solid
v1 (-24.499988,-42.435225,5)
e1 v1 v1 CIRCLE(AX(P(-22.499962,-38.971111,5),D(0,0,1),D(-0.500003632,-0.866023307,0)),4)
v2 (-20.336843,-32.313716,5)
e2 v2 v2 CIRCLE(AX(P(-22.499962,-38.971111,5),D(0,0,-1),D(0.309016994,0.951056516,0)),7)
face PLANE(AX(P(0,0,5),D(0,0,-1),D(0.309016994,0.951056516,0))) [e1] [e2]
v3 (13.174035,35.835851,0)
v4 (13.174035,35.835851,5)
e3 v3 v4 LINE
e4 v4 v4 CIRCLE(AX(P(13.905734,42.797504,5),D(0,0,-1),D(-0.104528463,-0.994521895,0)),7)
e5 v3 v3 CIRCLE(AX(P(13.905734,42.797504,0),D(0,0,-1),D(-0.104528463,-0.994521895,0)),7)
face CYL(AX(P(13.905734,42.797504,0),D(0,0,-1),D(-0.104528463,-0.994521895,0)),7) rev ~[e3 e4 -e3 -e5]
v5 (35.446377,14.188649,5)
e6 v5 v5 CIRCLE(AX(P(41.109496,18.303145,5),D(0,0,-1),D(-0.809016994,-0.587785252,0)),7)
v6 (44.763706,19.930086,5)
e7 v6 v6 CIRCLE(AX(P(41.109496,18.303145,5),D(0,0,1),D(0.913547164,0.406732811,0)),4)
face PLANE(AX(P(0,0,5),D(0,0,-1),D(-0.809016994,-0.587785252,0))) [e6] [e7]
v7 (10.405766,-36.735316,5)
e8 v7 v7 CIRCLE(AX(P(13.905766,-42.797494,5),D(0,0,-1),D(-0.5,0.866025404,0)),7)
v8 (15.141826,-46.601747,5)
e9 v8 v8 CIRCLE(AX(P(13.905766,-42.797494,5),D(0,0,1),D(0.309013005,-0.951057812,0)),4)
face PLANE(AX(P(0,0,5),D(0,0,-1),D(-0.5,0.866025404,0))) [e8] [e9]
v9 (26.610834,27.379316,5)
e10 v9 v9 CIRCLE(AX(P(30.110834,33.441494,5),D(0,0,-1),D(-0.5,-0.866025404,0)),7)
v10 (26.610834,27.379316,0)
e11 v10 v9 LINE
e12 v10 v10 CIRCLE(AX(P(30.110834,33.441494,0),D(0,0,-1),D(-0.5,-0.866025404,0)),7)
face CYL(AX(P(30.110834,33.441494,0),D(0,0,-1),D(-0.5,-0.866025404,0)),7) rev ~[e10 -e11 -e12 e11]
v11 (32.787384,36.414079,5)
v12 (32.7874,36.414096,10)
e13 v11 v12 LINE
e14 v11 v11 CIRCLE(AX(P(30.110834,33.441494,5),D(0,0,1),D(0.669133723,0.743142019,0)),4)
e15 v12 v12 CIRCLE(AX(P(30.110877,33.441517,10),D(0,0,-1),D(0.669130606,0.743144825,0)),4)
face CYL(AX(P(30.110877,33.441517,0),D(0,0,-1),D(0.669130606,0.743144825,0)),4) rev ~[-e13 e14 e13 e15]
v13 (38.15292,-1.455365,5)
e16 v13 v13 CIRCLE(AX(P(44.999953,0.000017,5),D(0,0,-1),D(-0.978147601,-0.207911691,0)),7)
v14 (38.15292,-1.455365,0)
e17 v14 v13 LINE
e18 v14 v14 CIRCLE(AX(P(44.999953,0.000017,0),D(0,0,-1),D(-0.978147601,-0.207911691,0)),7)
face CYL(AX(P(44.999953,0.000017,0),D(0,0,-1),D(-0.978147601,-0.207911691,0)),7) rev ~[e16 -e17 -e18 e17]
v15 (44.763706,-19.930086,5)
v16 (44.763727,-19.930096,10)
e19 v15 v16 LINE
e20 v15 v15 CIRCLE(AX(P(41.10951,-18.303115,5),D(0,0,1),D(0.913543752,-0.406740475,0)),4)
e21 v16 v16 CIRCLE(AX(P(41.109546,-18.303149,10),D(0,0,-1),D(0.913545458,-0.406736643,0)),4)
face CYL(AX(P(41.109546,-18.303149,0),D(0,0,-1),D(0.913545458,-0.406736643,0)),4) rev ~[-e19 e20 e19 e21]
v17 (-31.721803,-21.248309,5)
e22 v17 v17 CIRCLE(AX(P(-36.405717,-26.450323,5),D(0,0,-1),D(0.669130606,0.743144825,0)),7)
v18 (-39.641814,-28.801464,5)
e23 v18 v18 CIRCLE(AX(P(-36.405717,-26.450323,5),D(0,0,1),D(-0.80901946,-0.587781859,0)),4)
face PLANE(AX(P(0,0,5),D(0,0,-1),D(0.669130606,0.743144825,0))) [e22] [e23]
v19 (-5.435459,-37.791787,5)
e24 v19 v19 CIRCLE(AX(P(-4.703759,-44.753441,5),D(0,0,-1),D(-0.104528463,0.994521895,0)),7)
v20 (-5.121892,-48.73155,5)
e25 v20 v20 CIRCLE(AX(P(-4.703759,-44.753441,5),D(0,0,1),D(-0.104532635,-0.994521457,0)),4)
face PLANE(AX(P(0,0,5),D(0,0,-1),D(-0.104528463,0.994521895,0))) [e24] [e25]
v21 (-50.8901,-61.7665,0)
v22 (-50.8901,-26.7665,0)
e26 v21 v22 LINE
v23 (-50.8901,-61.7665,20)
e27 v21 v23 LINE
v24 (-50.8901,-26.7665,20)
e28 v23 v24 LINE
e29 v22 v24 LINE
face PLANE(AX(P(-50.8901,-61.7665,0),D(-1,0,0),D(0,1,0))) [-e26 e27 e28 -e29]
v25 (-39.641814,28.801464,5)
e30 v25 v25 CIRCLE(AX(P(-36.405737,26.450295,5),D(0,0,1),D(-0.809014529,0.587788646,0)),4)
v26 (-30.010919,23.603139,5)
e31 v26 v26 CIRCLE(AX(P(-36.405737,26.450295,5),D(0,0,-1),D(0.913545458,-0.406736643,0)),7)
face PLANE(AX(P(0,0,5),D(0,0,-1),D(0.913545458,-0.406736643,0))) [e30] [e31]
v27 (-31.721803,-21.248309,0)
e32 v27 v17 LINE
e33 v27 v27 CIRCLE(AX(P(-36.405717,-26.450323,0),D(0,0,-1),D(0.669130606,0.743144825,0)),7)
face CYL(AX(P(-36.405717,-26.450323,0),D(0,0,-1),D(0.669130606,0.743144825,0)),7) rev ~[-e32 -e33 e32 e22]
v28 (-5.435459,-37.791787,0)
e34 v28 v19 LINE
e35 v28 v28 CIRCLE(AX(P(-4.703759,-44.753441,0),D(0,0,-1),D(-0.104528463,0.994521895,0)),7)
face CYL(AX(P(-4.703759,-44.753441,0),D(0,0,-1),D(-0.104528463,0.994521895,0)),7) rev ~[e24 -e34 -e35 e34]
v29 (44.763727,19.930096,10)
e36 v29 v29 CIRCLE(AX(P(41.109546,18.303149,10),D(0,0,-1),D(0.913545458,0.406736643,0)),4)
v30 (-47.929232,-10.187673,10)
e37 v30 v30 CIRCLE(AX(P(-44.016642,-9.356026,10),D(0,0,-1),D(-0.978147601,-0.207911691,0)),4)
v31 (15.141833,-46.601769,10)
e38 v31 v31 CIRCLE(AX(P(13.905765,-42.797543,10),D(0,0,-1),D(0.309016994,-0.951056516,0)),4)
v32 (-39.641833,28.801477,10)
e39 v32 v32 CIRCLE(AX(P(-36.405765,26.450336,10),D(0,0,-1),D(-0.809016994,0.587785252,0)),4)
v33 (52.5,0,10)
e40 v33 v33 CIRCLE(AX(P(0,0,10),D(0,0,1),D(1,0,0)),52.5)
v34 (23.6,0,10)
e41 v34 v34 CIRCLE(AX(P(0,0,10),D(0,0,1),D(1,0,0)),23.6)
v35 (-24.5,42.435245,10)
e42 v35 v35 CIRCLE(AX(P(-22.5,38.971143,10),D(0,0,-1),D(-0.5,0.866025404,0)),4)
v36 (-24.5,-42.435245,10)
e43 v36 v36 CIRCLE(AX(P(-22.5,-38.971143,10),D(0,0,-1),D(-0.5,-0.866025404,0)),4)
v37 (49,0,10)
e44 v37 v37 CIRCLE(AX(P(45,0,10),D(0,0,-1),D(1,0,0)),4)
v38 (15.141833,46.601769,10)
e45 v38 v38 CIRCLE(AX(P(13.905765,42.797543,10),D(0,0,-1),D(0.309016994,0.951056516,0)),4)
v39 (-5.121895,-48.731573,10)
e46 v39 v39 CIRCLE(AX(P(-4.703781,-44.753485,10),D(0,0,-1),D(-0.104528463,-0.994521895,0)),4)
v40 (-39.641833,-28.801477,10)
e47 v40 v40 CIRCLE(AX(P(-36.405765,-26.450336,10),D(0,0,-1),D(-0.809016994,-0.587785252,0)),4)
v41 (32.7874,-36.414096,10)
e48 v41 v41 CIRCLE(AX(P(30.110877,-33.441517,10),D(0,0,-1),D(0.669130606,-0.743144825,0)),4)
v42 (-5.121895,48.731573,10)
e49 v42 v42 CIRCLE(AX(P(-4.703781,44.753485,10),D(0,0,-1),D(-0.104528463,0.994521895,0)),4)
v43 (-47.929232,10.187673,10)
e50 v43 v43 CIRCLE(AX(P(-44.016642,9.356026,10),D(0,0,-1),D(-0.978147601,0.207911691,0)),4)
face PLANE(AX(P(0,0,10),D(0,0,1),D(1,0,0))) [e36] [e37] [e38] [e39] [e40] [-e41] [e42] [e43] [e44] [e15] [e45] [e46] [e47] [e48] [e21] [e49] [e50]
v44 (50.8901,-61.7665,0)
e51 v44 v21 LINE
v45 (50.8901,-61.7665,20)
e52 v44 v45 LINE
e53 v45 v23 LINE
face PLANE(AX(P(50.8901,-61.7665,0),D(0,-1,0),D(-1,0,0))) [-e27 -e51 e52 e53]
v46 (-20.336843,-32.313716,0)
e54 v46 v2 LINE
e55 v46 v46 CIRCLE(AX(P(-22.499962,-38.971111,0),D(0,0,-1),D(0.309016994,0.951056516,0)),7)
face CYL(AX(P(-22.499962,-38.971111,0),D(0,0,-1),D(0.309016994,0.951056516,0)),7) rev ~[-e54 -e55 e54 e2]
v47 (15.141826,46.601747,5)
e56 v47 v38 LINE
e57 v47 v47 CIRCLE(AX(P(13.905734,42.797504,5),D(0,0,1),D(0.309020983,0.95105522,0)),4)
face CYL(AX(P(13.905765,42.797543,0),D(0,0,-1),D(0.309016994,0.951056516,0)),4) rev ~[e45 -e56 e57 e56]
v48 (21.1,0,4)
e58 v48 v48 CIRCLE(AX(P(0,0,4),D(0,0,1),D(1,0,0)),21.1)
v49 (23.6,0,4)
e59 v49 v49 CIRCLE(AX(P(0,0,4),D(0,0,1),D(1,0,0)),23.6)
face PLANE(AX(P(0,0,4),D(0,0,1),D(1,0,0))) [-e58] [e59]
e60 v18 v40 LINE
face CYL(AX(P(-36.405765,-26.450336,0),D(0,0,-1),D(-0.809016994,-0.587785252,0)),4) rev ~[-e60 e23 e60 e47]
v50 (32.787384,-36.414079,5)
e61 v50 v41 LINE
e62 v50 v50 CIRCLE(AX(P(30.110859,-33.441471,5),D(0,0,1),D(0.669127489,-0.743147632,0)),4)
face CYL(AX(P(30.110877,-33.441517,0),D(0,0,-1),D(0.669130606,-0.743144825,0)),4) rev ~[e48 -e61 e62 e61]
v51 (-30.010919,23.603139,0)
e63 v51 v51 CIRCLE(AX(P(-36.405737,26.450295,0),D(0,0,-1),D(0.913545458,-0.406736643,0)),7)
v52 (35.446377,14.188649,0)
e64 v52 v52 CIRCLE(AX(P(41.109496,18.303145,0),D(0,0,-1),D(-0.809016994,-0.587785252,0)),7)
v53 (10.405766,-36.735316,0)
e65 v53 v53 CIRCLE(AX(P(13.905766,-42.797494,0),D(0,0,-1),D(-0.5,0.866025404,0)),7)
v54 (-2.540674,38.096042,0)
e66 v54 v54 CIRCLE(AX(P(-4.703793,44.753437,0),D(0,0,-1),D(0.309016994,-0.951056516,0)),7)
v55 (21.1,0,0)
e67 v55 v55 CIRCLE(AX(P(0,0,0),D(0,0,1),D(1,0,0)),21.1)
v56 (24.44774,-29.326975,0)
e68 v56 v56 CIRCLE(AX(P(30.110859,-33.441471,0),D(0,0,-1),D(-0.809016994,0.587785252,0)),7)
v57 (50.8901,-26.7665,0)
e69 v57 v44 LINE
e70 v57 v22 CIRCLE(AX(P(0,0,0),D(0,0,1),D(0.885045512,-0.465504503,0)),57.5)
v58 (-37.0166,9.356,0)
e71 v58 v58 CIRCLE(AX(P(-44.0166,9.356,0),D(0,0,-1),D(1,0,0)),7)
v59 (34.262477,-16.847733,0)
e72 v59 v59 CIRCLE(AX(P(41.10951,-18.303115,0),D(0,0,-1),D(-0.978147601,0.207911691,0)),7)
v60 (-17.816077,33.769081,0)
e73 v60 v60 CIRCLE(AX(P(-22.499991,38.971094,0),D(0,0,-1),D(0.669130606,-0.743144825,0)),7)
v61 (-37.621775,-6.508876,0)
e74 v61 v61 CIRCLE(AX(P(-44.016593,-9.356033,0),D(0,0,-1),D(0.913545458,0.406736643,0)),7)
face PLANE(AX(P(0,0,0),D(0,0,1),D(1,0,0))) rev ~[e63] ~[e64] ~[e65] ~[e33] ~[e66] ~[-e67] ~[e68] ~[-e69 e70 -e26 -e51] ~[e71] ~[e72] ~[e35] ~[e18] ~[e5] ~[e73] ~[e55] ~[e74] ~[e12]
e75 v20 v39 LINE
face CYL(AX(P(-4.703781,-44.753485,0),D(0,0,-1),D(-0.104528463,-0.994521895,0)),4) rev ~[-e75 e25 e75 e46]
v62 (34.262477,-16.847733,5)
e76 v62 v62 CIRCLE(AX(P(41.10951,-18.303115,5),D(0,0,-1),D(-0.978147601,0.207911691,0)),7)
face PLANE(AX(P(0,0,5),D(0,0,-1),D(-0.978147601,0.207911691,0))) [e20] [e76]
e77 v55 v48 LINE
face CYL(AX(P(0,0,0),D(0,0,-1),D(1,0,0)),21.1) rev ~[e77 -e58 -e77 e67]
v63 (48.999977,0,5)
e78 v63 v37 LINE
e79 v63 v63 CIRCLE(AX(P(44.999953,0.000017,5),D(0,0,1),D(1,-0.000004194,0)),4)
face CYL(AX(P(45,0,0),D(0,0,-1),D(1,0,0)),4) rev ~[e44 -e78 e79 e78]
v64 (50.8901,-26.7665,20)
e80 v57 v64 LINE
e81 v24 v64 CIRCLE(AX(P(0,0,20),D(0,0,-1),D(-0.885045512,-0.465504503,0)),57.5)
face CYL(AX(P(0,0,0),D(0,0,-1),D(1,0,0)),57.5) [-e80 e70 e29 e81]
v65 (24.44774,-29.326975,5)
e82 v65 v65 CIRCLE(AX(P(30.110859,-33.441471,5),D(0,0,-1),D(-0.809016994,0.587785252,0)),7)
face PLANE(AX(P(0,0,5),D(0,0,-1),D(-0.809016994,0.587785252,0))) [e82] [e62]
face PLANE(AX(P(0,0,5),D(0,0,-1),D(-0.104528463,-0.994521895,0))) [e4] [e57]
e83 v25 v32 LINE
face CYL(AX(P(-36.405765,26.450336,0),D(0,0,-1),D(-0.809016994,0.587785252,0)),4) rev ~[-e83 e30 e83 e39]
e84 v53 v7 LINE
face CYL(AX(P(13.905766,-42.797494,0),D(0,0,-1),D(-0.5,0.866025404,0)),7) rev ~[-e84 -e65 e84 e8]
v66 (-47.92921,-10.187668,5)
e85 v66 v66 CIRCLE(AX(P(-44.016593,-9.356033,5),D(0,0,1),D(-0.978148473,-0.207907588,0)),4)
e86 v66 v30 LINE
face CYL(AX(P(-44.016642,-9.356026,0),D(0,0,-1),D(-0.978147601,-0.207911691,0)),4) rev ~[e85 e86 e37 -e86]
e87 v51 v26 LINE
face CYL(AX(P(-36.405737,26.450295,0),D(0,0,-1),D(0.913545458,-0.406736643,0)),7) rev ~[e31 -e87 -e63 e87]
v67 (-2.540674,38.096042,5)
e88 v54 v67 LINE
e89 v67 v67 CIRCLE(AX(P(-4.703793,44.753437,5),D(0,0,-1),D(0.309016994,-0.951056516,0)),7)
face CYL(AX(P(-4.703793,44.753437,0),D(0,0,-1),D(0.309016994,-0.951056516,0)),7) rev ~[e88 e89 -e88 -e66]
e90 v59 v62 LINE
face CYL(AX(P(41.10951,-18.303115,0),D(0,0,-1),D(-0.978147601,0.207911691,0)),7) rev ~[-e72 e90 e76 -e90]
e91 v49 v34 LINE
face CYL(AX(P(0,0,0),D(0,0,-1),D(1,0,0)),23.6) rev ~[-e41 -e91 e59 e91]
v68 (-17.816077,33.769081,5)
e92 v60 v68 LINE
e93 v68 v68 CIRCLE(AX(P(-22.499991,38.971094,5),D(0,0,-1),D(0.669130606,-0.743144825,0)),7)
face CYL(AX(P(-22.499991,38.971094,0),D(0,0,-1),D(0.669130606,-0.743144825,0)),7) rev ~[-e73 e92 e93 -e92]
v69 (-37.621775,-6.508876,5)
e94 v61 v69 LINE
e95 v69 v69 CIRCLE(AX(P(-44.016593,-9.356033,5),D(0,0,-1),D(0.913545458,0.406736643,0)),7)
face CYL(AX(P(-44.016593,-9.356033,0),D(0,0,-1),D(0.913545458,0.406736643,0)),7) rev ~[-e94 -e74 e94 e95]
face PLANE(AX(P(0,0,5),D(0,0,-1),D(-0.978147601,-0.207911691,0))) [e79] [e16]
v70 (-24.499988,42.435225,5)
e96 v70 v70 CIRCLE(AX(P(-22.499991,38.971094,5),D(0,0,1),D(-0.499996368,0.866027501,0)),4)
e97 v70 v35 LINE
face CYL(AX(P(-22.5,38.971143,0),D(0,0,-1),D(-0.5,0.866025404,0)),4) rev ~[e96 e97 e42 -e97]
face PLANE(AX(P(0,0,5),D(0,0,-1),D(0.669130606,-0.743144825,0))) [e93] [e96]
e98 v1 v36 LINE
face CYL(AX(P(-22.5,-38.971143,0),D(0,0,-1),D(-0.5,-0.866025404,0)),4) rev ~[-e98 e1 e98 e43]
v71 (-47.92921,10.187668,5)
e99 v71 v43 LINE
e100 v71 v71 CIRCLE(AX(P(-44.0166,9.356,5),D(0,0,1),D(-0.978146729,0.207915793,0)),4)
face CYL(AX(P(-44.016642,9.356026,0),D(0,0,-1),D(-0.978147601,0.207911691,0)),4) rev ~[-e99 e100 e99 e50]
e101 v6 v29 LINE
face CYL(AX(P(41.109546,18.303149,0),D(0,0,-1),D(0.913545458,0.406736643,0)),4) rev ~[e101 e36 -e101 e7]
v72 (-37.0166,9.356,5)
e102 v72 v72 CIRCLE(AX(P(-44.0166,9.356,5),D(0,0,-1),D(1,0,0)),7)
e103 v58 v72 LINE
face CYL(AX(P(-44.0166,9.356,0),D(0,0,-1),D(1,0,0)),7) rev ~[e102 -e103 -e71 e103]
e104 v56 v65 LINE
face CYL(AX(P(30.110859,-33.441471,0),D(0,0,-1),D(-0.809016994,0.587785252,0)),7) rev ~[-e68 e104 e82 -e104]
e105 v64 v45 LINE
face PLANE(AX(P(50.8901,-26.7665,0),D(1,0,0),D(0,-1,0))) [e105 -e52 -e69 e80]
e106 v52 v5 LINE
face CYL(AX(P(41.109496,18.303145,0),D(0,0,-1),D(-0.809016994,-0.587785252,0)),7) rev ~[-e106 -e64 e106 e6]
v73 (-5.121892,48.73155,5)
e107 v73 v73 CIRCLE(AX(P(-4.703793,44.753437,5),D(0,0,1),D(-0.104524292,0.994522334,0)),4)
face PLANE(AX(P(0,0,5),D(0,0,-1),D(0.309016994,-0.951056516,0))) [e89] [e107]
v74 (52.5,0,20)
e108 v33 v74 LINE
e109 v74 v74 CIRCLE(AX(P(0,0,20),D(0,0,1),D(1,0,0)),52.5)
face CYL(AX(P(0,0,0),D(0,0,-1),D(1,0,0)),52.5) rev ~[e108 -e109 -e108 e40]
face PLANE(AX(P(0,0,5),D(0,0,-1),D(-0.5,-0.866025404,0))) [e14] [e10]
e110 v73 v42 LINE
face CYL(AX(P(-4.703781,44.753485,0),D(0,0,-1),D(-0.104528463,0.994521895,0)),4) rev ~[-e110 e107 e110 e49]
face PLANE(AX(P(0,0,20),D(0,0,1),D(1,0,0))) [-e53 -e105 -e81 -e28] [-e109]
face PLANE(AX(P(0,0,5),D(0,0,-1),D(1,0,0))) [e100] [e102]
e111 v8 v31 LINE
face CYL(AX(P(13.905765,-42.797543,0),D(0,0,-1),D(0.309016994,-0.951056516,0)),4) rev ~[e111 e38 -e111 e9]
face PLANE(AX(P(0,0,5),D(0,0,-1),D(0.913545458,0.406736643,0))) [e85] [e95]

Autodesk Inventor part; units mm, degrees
ref_plane "YZ Plane" through (0, 0, 0) normal (1, 0, 0) x (0, 1, 0)
ref_plane "XZ Plane" through (0, 0, 0) normal (0, 1, 0) x (-1, 0, 0)
ref_plane "XY Plane" through (0, 0, 0) normal (0, 0, 1) x (1, 0, 0)
sketch "Sketch1" plane through (0, 0, 0) normal (0, 0, 1) x (1, 0, 0)
  circle A0 centre (0, 0) radius 45 construction
  circle A1 centre (45, 0) radius 4
  circle A2 centre (0, 0) radius 52.5
  circle A3 centre (0, 0) radius 57.5
  circle A4 centre (0, 0) radius 23.6
  circle A5 centre (0, 0) radius 21.1
  line L0 (50.8901, -26.7665) -> (50.8901, -61.7665)
  line L1 (50.8901, -61.7665) -> (-50.8901, -61.7665)
  line L2 (-50.8901, -61.7665) -> (-50.8901, -26.7665)
  line L3 (12, -56.7665) -> (-20, -56.7665) construction
  dimension "d0" = 90
  dimension "d1" = 8
  dimension "d2" = 105
  dimension "d3" = 5
  dimension "d16" = 47.2
  dimension "d20" = 2.5
  dimension "d27" = 35
  dimension "d28" = 5
extrude "Extrusion1" add sketch "Sketch1" along normal blind 20 contours A3 | A3 L0 L1 L2
extrude "Extrusion2" add sketch "Sketch1" along normal blind 10 contours A1 | A2
extrude "Extrusion3" cut sketch "Sketch1" along normal through all contours A1
pattern_circular "Circular Pattern2" count 15 over 360 about axis through (0, 0, -10) along (0, 0, 1) of "Extrusion3"
extrude "Extrusion4" add sketch "Sketch1" along normal blind 4 contours A4
sketch "Sketch2" plane through (0, 0, 0) normal (0, 0, -1) x (1, 0, 0)
  circle A0 centre (-44.0166, -9.356) radius 7
  circle A1 centre (-44.0166, -9.356) radius 4 projected
  point P0 (0, 0)
  dimension "d21" = 14
extrude "Extrusion5" cut sketch "Sketch2" against normal blind 5
pattern_circular "Circular Pattern3" count 15 over 360 about axis through (0, 0, 0) along (0, 0, 1) of "Extrusion5"
properties part number "RearCover" material "Lead"
